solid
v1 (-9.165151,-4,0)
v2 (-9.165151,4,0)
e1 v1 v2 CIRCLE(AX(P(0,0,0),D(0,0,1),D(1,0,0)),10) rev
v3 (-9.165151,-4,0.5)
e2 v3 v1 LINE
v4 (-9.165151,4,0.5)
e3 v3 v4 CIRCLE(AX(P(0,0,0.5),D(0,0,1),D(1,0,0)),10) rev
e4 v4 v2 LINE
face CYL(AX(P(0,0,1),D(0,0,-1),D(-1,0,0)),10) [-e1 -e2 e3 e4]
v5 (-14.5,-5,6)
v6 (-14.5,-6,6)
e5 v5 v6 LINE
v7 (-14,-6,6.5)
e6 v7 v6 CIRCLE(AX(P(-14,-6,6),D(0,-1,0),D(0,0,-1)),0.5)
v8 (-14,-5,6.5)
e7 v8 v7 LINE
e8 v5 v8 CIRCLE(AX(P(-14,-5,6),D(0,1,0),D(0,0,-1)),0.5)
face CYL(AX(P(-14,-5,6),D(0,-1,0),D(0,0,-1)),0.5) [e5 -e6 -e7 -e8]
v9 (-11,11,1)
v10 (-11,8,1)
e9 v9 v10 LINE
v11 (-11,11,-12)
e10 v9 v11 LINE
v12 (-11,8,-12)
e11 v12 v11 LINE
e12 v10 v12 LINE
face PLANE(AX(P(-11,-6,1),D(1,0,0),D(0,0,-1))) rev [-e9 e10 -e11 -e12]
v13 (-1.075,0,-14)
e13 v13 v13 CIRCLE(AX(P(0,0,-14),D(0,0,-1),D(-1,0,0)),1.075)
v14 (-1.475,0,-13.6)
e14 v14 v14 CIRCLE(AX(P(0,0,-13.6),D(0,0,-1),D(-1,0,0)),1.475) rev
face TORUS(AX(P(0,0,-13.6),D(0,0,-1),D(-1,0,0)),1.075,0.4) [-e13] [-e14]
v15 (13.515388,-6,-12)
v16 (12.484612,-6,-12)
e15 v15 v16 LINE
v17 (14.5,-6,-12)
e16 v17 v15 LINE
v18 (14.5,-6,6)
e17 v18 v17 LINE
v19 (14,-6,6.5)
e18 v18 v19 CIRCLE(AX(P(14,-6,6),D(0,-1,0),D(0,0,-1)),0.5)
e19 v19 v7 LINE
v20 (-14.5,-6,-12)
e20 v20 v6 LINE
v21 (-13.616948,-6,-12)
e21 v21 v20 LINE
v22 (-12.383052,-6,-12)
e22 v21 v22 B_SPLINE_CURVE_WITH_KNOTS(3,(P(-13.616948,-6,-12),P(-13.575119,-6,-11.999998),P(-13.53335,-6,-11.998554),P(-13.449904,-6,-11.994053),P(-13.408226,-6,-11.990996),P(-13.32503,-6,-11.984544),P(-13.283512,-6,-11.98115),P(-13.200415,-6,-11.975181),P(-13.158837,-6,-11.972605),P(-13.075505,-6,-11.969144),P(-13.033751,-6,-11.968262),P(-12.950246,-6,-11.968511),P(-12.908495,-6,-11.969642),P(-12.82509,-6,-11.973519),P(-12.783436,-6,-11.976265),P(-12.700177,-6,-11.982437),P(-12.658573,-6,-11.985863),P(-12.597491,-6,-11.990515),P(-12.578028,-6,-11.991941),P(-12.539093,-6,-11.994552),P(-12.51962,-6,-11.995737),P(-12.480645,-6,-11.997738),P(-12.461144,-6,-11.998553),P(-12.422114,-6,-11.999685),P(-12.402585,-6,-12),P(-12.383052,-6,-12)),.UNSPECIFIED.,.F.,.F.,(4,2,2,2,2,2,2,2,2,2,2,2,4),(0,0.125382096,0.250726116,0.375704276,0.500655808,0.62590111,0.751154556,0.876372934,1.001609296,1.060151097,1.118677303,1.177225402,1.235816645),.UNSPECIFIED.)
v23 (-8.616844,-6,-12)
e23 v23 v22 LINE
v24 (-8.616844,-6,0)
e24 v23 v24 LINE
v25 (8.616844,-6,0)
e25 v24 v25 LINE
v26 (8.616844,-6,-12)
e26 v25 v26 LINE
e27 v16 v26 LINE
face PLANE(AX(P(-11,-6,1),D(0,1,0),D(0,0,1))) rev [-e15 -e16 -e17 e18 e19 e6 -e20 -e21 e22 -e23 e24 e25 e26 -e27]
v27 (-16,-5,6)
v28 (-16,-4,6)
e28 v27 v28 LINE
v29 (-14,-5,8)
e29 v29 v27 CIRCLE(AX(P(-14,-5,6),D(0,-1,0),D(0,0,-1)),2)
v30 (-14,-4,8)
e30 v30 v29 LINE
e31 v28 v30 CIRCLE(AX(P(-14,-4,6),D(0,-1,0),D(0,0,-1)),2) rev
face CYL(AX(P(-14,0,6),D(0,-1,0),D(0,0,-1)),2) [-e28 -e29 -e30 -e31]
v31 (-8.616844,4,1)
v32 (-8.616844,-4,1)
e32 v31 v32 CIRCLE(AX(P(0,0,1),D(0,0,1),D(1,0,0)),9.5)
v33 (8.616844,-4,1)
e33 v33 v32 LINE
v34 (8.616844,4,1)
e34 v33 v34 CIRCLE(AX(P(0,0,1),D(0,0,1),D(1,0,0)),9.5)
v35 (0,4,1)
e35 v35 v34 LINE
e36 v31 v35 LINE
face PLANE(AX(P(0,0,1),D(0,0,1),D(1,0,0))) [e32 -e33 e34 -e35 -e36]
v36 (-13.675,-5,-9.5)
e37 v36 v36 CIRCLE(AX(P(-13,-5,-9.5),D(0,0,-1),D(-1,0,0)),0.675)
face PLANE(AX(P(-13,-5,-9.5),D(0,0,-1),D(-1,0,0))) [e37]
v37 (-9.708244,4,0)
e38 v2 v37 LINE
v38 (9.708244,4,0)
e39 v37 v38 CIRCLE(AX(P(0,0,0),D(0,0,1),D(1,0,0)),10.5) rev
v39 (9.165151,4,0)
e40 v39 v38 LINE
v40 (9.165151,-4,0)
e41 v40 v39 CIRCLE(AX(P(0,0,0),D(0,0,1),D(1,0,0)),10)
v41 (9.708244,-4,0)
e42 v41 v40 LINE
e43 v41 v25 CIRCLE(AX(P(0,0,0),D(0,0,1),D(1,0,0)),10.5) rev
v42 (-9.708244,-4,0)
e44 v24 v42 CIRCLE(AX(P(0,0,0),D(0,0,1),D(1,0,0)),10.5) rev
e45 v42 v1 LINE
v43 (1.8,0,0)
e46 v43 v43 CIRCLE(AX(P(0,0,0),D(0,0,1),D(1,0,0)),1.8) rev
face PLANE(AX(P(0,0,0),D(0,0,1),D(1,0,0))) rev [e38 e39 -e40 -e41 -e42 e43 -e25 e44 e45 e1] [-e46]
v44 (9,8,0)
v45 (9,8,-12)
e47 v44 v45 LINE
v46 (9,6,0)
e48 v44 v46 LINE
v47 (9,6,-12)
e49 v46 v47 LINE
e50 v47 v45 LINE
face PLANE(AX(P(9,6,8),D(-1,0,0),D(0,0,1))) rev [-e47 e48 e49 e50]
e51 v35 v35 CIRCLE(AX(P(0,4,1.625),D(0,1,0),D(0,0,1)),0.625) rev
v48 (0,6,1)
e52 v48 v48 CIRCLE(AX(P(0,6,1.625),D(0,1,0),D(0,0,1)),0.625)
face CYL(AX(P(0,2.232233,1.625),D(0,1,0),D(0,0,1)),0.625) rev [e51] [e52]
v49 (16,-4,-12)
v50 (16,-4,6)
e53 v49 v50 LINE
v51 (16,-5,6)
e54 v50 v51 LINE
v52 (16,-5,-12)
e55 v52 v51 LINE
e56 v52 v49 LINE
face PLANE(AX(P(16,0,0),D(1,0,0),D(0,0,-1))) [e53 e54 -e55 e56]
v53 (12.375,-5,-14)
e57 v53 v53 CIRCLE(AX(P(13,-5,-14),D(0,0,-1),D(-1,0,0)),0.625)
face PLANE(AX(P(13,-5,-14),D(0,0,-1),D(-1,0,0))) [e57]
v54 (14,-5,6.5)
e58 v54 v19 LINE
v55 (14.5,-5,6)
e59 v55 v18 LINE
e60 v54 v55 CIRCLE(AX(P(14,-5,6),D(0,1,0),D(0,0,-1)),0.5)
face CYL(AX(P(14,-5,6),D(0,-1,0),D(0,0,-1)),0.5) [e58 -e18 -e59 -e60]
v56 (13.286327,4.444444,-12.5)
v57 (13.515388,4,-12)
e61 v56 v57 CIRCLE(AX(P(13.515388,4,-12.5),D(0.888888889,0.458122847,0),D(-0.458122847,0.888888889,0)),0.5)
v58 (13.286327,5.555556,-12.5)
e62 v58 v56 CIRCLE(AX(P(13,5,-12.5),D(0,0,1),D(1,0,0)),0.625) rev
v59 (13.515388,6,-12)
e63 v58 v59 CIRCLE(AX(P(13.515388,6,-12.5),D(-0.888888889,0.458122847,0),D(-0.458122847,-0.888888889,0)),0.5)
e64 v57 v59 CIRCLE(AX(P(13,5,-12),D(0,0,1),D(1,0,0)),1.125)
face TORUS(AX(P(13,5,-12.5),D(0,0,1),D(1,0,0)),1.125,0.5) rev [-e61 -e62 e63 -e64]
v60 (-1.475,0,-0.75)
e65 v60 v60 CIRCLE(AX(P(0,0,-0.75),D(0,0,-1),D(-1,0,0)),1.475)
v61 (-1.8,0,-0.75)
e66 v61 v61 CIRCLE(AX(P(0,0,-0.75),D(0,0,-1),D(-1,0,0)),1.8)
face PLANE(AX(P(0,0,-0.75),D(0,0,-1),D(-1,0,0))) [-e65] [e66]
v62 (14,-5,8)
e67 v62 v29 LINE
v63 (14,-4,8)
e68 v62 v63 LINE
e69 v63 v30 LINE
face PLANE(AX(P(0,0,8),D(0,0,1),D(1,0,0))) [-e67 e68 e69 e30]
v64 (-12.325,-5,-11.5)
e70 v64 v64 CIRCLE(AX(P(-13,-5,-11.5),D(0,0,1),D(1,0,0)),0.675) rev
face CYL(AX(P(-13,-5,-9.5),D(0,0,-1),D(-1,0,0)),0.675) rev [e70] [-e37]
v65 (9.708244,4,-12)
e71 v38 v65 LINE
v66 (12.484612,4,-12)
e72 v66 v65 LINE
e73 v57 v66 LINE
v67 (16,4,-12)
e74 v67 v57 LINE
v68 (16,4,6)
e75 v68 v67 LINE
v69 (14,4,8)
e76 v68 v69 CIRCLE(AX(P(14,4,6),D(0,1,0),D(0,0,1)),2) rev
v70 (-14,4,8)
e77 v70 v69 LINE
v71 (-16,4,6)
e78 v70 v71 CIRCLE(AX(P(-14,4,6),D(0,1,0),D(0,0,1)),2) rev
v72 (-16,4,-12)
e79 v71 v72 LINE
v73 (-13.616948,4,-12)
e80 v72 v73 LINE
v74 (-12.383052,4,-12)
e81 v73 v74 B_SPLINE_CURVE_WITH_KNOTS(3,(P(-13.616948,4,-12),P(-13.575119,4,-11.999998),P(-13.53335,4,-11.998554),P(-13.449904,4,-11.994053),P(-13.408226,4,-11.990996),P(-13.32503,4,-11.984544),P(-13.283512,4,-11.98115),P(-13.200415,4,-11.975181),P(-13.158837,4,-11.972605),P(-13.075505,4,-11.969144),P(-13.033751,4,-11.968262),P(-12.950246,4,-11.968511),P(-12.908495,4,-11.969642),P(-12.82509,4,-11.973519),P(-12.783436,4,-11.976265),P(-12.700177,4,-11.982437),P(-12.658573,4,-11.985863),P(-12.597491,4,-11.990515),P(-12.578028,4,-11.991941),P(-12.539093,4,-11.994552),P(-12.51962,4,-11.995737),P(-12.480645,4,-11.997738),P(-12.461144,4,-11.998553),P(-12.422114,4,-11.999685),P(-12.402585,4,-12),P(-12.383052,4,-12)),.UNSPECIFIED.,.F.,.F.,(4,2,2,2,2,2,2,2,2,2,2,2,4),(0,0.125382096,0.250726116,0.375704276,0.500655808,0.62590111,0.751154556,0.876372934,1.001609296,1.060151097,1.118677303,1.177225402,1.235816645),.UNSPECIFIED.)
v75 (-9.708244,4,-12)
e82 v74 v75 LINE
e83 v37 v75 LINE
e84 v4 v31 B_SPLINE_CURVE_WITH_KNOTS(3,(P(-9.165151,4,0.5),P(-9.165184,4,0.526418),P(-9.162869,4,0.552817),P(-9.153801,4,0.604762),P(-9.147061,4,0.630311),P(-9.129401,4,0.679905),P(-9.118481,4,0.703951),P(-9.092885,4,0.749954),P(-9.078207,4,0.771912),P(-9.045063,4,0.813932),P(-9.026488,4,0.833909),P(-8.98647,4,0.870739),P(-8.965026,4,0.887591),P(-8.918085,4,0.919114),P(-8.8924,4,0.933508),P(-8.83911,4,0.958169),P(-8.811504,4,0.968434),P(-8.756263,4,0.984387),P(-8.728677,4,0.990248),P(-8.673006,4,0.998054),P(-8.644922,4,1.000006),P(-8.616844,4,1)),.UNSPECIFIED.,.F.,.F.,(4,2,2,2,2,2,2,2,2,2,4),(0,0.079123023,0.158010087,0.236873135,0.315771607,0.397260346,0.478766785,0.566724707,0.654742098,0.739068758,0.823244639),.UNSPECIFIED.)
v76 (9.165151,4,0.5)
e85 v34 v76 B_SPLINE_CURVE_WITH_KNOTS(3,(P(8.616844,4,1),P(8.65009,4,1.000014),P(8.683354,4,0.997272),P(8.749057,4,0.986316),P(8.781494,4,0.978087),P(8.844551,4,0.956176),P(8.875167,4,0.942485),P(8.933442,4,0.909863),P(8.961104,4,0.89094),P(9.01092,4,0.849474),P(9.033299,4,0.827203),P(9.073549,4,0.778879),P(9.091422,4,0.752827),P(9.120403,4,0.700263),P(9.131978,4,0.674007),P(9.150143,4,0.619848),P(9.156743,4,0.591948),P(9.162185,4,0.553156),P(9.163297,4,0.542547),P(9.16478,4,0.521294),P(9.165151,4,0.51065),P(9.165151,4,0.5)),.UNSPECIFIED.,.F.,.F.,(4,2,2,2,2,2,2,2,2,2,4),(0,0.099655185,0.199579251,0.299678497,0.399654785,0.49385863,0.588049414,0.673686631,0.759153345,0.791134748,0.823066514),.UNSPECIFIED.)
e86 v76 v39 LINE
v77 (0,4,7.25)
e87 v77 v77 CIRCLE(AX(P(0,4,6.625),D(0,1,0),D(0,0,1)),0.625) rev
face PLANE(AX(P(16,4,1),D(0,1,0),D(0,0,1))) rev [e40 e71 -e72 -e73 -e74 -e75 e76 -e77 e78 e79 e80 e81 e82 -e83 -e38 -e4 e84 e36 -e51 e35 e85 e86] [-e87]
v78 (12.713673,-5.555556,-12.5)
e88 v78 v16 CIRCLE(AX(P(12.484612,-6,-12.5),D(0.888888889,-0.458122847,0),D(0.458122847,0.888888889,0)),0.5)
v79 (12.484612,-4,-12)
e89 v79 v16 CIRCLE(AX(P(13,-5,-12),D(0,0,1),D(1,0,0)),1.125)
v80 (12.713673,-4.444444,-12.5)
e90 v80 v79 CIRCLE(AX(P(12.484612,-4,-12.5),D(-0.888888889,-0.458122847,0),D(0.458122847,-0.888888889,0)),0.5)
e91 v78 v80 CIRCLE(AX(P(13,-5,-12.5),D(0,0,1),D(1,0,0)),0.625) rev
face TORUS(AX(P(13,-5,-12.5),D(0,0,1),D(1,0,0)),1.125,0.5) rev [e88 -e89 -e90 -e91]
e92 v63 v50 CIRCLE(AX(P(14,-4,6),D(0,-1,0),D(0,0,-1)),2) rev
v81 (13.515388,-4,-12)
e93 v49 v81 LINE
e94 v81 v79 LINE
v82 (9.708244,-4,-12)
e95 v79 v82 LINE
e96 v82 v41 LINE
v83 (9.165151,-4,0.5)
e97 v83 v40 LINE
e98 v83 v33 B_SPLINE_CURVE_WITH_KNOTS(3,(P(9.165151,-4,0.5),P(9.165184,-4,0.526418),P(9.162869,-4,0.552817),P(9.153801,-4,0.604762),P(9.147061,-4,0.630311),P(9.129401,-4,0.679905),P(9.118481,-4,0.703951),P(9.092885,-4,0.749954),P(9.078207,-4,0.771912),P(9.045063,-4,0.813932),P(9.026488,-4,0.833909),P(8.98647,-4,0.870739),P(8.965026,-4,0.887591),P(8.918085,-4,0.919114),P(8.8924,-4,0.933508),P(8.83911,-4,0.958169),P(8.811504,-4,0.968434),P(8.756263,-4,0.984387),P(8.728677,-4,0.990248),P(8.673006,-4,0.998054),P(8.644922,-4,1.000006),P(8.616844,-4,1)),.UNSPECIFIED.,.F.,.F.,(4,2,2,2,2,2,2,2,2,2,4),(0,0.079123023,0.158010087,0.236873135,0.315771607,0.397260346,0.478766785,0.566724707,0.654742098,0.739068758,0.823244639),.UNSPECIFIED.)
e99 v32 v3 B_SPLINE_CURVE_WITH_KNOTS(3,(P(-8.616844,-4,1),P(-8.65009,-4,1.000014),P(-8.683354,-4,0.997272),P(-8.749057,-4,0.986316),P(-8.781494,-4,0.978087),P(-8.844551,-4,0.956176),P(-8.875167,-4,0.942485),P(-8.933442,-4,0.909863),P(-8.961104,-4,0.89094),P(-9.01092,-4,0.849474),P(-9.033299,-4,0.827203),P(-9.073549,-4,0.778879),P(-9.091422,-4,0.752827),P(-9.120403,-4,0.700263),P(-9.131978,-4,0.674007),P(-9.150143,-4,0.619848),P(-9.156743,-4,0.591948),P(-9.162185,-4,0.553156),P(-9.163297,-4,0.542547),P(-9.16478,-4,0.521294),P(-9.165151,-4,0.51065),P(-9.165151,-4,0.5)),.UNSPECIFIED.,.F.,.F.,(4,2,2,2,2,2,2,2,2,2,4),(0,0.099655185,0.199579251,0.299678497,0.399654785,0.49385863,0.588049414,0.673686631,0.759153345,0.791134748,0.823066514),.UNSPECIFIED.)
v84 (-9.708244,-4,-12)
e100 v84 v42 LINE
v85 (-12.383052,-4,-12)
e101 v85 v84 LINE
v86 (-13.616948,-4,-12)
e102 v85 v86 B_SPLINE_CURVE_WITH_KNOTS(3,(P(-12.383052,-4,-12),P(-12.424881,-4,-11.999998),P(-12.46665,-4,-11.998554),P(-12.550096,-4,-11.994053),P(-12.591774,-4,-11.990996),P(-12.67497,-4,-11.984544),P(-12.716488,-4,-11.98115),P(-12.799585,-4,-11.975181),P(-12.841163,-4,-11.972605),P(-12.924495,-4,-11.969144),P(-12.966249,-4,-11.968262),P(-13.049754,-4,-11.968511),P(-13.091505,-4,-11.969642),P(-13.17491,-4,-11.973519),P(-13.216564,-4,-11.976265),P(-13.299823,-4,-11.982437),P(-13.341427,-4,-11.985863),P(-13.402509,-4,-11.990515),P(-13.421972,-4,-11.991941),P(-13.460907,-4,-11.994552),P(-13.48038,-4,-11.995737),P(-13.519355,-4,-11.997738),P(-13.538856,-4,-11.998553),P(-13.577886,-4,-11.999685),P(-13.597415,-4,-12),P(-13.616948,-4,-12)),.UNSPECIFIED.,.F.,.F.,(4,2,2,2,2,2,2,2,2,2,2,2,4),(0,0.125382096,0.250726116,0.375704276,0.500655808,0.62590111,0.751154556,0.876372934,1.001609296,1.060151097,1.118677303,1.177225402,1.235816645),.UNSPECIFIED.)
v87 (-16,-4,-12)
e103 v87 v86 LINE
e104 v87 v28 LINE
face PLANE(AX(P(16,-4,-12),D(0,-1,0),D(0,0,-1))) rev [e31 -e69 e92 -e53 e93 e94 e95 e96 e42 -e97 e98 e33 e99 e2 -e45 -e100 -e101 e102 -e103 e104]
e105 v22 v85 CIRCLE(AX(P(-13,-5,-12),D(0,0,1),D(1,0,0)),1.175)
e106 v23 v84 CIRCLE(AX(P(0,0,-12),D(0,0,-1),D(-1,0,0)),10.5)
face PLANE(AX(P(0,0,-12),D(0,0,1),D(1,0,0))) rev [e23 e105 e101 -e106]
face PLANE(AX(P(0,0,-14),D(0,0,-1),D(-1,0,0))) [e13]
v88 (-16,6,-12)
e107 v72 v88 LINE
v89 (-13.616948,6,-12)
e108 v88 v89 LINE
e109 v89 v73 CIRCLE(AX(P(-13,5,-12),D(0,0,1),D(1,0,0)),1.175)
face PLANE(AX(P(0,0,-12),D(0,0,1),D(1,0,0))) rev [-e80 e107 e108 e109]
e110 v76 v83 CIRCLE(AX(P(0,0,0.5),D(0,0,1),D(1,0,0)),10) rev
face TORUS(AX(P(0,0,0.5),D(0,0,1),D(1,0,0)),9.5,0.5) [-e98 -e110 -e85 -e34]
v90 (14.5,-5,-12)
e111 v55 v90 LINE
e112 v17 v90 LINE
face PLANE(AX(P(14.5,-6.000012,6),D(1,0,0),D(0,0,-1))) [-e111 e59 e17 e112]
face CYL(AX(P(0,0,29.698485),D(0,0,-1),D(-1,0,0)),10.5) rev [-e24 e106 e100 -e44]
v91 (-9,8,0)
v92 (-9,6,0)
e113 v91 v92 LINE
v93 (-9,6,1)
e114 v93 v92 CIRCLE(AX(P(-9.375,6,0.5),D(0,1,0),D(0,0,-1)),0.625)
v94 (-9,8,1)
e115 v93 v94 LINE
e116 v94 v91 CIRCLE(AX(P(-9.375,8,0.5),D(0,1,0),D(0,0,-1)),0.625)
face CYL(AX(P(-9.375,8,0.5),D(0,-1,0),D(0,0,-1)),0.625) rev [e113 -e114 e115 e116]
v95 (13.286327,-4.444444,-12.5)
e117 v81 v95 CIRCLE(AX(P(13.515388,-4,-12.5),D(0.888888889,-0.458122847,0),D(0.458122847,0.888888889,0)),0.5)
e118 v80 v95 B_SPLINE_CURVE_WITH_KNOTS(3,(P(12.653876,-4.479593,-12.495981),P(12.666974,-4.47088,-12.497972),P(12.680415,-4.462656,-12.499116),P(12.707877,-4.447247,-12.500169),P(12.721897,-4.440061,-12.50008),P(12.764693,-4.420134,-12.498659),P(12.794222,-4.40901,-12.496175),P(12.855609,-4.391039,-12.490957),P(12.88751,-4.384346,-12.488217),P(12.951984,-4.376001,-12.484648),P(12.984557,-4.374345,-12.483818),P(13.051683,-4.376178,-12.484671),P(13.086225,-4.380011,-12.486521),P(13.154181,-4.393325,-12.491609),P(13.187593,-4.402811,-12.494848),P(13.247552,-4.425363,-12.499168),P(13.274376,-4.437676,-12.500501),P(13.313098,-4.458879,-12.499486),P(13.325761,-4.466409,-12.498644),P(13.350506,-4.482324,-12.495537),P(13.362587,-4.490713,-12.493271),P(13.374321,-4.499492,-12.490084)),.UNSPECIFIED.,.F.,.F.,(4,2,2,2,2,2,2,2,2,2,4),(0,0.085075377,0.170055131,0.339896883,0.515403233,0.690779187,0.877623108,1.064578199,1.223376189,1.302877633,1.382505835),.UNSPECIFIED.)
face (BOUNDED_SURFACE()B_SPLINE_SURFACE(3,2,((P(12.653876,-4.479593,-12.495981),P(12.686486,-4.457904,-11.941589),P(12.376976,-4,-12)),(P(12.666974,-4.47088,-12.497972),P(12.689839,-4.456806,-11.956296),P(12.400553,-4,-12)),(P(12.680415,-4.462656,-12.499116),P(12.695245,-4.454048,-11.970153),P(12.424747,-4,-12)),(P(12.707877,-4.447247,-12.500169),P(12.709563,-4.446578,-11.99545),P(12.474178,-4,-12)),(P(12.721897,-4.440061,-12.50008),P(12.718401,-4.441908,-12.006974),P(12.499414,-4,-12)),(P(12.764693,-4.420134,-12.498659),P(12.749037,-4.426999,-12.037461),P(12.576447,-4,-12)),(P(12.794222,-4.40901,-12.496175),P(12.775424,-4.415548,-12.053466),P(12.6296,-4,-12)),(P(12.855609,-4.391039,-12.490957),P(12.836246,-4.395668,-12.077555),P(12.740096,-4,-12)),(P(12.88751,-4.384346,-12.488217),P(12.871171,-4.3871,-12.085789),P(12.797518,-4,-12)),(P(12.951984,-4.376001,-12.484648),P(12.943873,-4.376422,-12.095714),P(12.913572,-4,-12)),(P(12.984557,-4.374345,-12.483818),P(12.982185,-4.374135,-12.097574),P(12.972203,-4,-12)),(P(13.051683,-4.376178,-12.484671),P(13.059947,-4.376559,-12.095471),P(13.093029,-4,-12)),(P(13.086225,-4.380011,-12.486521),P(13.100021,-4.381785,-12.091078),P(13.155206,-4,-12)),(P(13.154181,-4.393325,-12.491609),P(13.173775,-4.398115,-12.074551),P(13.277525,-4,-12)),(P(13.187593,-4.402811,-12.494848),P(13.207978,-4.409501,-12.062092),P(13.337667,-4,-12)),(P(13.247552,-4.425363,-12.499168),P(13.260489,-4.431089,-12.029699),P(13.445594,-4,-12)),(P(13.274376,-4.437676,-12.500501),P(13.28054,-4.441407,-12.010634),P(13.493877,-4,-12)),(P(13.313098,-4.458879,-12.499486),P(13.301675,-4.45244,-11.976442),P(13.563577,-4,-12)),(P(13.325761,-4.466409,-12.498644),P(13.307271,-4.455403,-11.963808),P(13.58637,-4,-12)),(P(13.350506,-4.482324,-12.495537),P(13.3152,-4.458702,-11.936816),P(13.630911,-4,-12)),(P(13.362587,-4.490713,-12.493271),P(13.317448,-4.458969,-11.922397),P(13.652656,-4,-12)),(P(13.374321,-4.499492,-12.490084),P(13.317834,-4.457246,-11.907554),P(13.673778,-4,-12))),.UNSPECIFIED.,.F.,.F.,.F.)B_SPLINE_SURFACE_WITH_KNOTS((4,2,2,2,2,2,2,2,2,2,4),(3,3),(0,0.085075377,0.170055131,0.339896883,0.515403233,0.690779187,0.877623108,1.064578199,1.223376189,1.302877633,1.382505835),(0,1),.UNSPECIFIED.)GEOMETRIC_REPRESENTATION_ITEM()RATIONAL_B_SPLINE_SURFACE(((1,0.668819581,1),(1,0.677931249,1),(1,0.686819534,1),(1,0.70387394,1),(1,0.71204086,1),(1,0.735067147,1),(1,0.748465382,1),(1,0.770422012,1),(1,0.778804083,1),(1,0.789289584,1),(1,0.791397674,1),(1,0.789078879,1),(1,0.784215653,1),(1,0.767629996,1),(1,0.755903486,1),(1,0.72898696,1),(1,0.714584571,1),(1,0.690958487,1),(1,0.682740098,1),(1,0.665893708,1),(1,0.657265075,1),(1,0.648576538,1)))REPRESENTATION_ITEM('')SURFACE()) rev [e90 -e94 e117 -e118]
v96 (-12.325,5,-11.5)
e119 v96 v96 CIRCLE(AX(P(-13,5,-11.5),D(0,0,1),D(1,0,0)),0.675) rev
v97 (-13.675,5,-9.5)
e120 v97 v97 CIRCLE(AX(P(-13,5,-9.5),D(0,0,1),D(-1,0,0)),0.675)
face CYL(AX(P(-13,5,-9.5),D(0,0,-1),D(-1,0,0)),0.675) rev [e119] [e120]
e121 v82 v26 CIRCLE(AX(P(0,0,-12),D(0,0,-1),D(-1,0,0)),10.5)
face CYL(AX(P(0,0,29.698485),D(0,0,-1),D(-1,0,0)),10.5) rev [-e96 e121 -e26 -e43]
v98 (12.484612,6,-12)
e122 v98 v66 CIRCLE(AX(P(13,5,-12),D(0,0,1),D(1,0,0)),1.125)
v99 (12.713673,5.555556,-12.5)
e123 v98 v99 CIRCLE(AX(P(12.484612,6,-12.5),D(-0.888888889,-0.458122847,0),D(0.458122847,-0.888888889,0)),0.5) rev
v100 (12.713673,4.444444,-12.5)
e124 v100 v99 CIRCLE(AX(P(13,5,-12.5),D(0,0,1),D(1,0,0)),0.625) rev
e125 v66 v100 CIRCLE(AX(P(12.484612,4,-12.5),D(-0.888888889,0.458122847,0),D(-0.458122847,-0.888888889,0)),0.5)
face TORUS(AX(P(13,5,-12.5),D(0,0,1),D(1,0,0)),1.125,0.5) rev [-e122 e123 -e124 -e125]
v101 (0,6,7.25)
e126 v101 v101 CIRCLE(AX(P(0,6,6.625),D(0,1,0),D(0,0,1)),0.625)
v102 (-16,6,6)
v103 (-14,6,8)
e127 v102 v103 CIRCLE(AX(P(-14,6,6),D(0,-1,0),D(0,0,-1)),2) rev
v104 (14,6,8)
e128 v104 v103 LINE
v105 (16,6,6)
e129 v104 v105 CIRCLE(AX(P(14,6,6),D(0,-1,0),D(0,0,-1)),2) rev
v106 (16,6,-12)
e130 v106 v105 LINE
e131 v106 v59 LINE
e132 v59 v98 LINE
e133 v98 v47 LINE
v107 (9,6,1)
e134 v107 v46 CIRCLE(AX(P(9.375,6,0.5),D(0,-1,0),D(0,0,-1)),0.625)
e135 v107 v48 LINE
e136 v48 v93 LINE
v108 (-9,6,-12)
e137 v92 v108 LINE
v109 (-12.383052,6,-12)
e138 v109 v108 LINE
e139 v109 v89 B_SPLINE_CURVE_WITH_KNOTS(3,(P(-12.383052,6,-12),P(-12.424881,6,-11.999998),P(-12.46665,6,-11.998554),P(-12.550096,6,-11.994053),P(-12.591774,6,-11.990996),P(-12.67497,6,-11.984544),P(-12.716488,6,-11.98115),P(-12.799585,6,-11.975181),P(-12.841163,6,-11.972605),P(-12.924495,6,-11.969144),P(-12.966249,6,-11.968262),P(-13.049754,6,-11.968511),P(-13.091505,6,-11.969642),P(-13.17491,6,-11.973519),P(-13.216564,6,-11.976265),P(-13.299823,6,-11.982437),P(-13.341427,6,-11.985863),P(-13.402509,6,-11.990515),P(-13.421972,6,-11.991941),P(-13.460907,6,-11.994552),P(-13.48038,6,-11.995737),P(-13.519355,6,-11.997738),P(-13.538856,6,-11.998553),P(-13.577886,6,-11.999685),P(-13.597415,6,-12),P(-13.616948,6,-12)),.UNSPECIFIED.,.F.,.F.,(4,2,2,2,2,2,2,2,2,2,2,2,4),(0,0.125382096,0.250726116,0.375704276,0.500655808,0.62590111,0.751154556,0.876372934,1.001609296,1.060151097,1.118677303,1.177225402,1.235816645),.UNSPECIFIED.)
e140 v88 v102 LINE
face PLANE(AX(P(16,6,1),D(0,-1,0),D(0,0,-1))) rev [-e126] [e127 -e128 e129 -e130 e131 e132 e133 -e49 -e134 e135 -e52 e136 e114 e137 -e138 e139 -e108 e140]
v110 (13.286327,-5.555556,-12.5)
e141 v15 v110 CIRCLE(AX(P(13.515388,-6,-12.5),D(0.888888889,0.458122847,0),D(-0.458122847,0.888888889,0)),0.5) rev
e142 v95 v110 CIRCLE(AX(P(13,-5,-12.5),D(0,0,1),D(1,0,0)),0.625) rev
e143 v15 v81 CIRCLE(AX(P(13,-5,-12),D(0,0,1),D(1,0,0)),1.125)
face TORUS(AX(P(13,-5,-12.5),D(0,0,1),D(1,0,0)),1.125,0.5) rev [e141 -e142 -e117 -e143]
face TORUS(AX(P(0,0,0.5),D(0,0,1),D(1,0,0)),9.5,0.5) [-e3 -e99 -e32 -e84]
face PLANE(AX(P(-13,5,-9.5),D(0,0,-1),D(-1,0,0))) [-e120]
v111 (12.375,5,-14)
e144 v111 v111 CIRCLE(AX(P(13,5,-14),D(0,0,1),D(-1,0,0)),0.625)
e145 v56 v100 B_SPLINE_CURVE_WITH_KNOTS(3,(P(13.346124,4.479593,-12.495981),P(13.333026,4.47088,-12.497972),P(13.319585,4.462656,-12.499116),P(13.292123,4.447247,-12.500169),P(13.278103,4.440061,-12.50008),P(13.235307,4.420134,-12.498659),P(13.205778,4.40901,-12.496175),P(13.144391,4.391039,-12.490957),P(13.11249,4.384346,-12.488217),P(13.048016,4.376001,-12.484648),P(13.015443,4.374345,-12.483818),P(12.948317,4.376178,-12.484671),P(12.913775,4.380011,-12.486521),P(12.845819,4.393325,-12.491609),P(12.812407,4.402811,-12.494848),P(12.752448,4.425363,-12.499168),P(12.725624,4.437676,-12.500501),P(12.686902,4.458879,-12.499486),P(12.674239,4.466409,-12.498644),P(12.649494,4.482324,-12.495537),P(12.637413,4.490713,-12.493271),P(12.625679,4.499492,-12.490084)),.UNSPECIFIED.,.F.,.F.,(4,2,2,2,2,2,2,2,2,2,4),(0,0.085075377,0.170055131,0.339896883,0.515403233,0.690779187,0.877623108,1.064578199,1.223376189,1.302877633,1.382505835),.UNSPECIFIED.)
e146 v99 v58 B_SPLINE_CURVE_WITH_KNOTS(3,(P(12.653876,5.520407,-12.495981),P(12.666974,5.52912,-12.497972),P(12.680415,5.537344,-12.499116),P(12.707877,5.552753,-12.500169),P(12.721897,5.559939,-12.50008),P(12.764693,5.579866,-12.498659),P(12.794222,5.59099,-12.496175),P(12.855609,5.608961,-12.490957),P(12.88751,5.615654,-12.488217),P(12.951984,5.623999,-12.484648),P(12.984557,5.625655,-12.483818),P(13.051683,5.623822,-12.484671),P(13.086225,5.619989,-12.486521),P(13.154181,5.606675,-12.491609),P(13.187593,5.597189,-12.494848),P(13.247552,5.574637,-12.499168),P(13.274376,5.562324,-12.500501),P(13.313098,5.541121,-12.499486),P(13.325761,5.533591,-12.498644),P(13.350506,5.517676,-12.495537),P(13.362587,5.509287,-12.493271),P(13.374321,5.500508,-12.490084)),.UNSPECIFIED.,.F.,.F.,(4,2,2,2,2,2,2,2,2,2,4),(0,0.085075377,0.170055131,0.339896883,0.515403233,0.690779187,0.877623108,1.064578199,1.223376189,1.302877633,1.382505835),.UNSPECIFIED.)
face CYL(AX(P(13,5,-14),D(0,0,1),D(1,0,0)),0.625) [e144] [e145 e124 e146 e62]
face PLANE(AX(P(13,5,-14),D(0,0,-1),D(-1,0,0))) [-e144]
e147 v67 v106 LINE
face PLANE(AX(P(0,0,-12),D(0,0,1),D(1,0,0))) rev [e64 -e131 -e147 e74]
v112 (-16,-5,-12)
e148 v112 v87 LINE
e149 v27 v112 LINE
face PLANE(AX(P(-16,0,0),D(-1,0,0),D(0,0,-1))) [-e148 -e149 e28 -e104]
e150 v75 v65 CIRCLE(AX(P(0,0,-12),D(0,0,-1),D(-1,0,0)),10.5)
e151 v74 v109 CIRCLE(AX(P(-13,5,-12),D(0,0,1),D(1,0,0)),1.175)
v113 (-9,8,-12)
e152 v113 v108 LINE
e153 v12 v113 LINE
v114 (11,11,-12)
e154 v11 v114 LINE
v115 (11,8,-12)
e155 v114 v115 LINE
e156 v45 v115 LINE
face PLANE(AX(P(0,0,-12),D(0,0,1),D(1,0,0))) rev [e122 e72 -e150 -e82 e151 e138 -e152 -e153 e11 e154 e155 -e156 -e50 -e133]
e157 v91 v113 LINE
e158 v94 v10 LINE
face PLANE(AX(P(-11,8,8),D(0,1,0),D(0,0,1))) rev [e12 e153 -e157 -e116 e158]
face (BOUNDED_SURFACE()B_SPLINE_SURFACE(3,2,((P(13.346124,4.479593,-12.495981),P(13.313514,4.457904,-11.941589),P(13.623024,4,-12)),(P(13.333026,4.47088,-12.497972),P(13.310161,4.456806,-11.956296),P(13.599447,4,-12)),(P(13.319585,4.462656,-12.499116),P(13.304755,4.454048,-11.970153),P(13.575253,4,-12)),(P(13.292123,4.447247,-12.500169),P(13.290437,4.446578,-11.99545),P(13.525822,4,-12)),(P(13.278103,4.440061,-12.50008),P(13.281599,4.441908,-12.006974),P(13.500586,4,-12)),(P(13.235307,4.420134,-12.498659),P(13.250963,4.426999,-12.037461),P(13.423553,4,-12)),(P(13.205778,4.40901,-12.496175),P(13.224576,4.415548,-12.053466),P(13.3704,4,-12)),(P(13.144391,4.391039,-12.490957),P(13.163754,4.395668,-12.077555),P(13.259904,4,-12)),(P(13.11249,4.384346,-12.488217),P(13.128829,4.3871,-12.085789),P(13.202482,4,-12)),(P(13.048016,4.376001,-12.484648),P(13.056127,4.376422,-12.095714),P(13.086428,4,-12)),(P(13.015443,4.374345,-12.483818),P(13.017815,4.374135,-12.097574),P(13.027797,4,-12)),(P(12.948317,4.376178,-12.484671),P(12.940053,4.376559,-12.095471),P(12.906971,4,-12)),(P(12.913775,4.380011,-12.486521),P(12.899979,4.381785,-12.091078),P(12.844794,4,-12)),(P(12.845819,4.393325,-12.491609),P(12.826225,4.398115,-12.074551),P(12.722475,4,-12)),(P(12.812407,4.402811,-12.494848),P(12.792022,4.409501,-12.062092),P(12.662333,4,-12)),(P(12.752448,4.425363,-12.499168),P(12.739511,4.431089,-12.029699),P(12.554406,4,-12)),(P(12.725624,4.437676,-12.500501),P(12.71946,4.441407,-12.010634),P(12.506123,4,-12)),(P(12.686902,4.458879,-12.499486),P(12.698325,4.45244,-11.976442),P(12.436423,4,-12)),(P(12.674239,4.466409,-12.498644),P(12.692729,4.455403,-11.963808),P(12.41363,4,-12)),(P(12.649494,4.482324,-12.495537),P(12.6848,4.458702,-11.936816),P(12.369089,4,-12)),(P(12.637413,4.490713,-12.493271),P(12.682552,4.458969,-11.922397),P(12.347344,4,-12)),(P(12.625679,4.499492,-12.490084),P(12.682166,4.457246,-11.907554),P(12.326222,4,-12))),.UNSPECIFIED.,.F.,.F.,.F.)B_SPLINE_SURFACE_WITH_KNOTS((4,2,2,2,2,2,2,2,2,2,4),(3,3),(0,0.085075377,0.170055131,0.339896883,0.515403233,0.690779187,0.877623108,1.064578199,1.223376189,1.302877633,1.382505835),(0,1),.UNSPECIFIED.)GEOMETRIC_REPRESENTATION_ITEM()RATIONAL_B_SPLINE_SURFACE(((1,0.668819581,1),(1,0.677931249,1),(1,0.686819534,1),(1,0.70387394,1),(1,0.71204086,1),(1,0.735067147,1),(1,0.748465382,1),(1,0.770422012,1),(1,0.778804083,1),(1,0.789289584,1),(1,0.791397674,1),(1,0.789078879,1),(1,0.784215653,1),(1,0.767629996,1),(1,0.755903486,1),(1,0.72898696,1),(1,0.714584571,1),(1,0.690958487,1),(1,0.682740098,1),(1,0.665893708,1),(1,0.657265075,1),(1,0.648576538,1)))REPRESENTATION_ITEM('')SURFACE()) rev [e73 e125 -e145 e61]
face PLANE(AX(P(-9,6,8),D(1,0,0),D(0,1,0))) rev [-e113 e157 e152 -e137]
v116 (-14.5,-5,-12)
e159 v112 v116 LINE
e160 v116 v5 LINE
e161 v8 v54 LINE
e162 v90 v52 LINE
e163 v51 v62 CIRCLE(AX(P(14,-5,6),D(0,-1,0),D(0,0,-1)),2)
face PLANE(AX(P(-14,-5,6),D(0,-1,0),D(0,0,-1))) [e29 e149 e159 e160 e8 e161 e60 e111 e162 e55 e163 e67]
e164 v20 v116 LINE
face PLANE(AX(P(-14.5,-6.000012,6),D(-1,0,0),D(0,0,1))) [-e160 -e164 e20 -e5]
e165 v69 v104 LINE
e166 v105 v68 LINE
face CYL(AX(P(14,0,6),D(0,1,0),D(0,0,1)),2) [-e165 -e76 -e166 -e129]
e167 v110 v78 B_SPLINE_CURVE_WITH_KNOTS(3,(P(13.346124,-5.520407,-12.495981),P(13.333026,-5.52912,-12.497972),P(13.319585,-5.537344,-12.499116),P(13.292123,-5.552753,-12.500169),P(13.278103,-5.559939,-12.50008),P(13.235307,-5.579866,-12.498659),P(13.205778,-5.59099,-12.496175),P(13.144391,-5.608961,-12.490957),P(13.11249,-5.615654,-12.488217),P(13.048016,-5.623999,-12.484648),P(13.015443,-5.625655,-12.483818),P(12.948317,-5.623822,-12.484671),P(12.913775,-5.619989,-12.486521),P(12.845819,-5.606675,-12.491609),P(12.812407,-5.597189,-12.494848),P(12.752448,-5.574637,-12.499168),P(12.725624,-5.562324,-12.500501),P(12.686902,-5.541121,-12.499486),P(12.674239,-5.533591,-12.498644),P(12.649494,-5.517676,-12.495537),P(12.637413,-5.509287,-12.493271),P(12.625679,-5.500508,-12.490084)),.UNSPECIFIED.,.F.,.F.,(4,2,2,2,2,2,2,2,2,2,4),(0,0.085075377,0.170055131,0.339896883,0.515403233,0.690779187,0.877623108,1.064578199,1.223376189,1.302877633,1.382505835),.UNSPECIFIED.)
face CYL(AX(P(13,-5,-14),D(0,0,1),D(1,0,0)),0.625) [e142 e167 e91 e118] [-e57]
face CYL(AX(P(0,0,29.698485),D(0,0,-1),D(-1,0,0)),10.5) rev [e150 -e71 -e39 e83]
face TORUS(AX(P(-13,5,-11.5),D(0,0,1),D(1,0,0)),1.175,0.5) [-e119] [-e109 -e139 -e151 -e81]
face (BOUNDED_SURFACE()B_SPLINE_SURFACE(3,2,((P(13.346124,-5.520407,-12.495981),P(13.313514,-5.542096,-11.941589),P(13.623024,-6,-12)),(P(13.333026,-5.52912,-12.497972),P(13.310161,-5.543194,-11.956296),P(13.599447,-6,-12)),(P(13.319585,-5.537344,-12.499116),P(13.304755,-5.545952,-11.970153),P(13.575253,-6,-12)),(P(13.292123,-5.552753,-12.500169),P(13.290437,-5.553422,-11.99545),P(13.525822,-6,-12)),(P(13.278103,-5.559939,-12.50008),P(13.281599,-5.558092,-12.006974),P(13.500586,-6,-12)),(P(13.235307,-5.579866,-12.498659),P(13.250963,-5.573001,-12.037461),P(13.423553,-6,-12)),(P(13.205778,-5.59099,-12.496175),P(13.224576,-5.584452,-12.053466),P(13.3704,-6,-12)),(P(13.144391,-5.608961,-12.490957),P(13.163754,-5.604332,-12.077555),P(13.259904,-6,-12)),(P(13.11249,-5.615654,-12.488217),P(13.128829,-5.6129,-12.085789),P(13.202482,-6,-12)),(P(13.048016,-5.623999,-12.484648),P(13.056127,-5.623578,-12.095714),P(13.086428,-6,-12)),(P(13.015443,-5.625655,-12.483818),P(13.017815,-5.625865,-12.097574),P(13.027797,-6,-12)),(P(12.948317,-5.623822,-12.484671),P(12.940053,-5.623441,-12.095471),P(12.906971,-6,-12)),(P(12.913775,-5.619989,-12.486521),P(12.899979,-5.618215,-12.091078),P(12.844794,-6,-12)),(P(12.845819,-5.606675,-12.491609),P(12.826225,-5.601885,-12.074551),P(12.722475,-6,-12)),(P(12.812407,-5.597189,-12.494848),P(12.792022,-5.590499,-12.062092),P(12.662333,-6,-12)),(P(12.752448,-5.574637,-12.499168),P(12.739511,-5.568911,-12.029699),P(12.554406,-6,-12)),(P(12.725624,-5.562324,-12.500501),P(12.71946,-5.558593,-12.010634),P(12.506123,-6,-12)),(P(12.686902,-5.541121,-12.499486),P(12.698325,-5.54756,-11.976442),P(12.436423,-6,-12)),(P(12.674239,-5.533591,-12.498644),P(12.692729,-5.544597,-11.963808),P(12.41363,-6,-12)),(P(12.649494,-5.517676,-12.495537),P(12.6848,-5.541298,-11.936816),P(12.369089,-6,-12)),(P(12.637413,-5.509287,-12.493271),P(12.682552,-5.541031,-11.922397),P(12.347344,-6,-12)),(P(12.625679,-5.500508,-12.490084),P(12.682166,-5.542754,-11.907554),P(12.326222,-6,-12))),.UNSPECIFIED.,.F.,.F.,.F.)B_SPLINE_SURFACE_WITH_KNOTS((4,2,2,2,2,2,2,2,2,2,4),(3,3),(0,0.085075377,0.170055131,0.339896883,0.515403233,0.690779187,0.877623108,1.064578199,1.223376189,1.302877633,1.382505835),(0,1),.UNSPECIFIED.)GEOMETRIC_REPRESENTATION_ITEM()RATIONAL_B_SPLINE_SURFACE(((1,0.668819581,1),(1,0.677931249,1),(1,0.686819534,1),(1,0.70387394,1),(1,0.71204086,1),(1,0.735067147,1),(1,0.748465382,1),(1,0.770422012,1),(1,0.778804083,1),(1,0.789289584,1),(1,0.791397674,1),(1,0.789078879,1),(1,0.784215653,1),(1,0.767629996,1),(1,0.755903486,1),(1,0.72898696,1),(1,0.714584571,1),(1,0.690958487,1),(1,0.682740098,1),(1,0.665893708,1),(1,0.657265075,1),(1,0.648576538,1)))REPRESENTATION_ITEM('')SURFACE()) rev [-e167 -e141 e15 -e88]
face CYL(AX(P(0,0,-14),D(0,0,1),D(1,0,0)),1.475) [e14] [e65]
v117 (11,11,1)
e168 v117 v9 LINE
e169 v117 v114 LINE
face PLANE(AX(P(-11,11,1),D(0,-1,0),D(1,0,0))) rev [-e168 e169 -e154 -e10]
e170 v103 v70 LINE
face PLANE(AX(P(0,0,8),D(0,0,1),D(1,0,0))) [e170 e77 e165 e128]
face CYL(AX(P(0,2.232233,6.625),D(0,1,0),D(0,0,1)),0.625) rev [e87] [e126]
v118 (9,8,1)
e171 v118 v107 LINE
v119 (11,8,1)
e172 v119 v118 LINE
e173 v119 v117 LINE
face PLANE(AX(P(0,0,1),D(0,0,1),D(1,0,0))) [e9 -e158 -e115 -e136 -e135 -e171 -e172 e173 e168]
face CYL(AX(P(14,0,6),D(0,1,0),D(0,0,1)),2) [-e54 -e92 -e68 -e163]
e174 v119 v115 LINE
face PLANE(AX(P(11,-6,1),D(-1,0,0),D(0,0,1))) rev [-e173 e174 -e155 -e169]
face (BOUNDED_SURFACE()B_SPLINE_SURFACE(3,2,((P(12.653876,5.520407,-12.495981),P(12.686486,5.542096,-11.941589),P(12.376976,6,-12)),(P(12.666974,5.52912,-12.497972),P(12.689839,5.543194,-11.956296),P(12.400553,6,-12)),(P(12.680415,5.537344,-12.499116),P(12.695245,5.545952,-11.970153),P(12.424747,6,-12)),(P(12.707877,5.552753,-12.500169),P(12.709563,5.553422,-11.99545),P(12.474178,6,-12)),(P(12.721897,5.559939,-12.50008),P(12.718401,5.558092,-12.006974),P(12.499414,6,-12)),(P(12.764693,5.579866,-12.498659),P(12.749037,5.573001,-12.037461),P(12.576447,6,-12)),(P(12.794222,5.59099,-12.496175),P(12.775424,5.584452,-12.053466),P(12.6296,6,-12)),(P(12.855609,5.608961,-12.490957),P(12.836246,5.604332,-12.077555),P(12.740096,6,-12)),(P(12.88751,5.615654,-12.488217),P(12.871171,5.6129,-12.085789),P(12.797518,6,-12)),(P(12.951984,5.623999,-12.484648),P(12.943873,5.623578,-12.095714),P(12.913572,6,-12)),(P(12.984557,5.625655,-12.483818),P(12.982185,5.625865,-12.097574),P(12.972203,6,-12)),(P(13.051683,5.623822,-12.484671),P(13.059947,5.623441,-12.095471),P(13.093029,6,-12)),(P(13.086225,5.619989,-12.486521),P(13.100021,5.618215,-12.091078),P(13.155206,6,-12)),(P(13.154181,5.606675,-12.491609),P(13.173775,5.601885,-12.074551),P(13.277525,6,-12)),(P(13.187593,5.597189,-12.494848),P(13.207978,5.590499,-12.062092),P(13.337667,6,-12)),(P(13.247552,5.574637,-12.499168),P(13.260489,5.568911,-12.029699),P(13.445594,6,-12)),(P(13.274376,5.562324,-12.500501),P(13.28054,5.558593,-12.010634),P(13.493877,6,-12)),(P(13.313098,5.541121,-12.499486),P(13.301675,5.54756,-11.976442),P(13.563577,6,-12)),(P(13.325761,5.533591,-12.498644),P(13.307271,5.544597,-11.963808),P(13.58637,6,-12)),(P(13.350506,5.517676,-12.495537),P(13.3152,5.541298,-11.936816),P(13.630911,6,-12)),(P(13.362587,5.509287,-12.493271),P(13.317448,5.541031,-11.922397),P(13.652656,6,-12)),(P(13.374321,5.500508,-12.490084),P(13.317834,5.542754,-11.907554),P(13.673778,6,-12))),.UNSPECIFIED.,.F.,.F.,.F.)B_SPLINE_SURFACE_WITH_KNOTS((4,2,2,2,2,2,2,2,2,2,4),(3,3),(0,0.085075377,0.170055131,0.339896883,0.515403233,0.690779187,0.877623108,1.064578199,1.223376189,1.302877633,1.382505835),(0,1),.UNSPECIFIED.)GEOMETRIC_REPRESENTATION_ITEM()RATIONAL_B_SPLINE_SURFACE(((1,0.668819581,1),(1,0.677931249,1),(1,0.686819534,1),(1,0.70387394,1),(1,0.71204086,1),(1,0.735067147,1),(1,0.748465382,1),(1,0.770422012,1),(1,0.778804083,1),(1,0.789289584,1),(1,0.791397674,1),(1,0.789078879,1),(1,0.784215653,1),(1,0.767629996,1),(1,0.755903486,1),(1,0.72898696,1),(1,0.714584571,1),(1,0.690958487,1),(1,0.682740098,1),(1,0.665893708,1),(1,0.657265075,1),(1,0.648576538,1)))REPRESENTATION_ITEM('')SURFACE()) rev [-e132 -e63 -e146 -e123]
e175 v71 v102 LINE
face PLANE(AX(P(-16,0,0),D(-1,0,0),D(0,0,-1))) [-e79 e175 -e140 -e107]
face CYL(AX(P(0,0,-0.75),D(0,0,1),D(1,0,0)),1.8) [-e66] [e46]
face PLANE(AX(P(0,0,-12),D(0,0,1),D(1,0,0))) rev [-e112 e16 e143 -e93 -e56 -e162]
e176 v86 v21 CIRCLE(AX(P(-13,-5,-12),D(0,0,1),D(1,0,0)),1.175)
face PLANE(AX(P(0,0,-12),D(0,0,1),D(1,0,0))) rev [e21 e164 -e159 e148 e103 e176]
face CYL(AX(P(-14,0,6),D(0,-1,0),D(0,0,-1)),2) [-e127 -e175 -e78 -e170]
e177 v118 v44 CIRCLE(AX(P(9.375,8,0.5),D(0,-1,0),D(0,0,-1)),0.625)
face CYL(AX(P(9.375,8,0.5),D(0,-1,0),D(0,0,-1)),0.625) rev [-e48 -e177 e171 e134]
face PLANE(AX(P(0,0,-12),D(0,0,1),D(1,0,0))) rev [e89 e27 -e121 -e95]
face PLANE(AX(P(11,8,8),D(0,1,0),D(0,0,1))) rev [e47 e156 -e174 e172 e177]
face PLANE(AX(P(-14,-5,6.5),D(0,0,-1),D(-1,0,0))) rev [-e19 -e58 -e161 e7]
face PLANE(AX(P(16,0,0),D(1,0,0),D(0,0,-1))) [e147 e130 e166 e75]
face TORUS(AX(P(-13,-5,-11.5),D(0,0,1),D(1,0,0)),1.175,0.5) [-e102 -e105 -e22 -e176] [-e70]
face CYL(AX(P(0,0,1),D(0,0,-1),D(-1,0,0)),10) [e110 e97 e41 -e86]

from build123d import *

# Parameters (mm, degrees)
BOSS_EXTRUDE1_DEPTH     = 1
SKETCH2_R               = 1.475
BOSS_EXTRUDE2_DEPTH     = 14
SKETCH3_R               = 1.8
BOSS_EXTRUDE3_DEPTH     = 0.75
SKETCH4_W               = 2
SKETCH4_H               = 17
BOSS_EXTRUDE4_DEPTH     = 12
SKETCH5_W               = 18
SKETCH5_H               = 2
BOSS_EXTRUDE5_DEPTH     = 12
SKETCH6_W               = 13
SKETCH6_H               = 2
BOSS_EXTRUDE6_DEPTH     = 5
BOSS_EXTRUDE7_DEPTH     = 12
CUT_EXTRUDE1_DEPTH      = 24.366642891
SKETCH9_W               = 2.937742252
SKETCH9_H               = 8
CUT_EXTRUDE2_DEPTH      = 12
CUT_EXTRUDE11_START     = -12
SKETCH21_R              = 10.5
SKETCH21_R_2            = 1.8
CUT_EXTRUDE11_DEPTH     = 12
SKETCH10_W              = 32
SKETCH10_H              = 2
BOSS_EXTRUDE8_DEPTH     = 7
FILLET1_R               = 0.5
SKETCH11_R              = 0.625
BOSS_EXTRUDE9_DEPTH     = 2
SKETCH14_W              = 2
SKETCH14_H              = 2
CUT_EXTRUDE5_DEPTH      = 28.874719859
SKETCH12_R              = 0.675
CUT_EXTRUDE3_DEPTH      = 2.5
CUT_EXTRUDE6_DEPTH      = 2
FILLET2_R               = 0.5
FILLET3_R               = 0.5
FILLET4_R               = 2
CUT_EXTRUDE7_DEPTH      = 28.221315288
CUT_EXTRUDE7_DEPTH_BACK = 1
SKETCH19_R              = 0.625
CUT_EXTRUDE9_DEPTH      = 2
FILLET5_R               = 0.4


with BuildPart() as part:
    # Sketch1 → Boss-Extrude1 (new body)
    with BuildSketch(Plane.XY):
        Polygon((-11, 6), (-11, 11), (11, 11), (11, 6), (11, -6), (-11, -6), align=None)
    extrude(amount=BOSS_EXTRUDE1_DEPTH)

    # Sketch2 → Boss-Extrude2 (add)
    with BuildSketch(Plane(origin=(0, 0, 0), x_dir=(-1, 0, 0), z_dir=(0, 0, -1))):
        with Locations(Location((0, 0, 0), (0, 0, 180))):
            Circle(SKETCH2_R)
    extrude(amount=BOSS_EXTRUDE2_DEPTH)

    # Sketch3 → Boss-Extrude3 (add)
    with BuildSketch(Plane(origin=(0, 0, 0), x_dir=(-1, 0, 0), z_dir=(0, 0, -1))):
        with Locations(Location((0, 0, 0), (0, 0, 180))):
            Circle(SKETCH3_R)
    extrude(amount=BOSS_EXTRUDE3_DEPTH)

    # Sketch4 → Boss-Extrude4 (add)
    with BuildSketch(Plane(origin=(0, 0, 0), x_dir=(-1, 0, 0), z_dir=(0, 0, -1))):
        with Locations((10, 2.5)):
            Rectangle(SKETCH4_W, SKETCH4_H)
        with Locations((-10, 2.5)):
            Rectangle(SKETCH4_W, SKETCH4_H)
    extrude(amount=BOSS_EXTRUDE4_DEPTH)

    # Sketch5 → Boss-Extrude5 (add)
    with BuildSketch(Plane(origin=(0, 0, 0), x_dir=(-1, 0, 0), z_dir=(0, 0, -1))):
        with Locations((0, 10)):
            Rectangle(SKETCH5_W, SKETCH5_H)
    extrude(amount=BOSS_EXTRUDE5_DEPTH)

    # Sketch6 → Boss-Extrude6 (add)
    with BuildSketch(Plane(origin=(11, 0, 0), x_dir=(0, 0, -1), z_dir=(1, 0, 0))):
        with Locations((5.5, -5)):
            Rectangle(SKETCH6_W, SKETCH6_H)
        with Locations((5.5, 5)):
            Rectangle(SKETCH6_W, SKETCH6_H)
    boss_extrude6 = extrude(amount=BOSS_EXTRUDE6_DEPTH)

    # Mirror1: Boss-Extrude6 across plane
    add(boss_extrude6.mirror(Plane(origin=(0, 0, 0), x_dir=(0, 0, 1), z_dir=(1, 0, 0))))

    # Sketch7 → Boss-Extrude7 (add)
    with BuildSketch(Plane(origin=(0, 0, -12), x_dir=(-1, 0, 0), z_dir=(0, 0, -1))):
        with BuildLine():
            ThreePointArc((-6.708203932, -6), (-8.407551231, -3.211398808), (-9, 0))
            Line((-9, 0), (-9, -6))
            Line((-9, -6), (-6.708203932, -6))
        make_face()
        with BuildLine():
            Line((-9, 9), (-9, 0))
            ThreePointArc((-9, 0), (-6.363961031, 6.363961031), (0, 9))
            Line((0, 9), (-9, 9))
        make_face()
    boss_extrude7 = extrude(amount=-BOSS_EXTRUDE7_DEPTH)

    # Sketch8 → Cut-Extrude1 (cut, through all)
    with BuildSketch(Plane(origin=(0, 0, -12), x_dir=(-1, 0, 0), z_dir=(0, 0, -1))):
        with BuildLine():
            Line((-11, 4), (-9.16515139, 4))
            ThreePointArc((-9.16515139, 4), (-10, 0), (-9.16515139, -4))
            Line((-9.16515139, -4), (-11, -4))
            Line((-11, -4), (-11, 4))
        make_face()
    cut_extrude1 = extrude(amount=-CUT_EXTRUDE1_DEPTH, mode=Mode.SUBTRACT)

    # Sketch9 → Cut-Extrude2 (cut)
    with BuildSketch(Plane(origin=(0, 0, -12), x_dir=(-1, 0, 0), z_dir=(0, 0, -1))):
        with Locations((-9.531128874, 0)):
            Rectangle(SKETCH9_W, SKETCH9_H)
    cut_extrude2 = extrude(amount=-CUT_EXTRUDE2_DEPTH, mode=Mode.SUBTRACT)

    # Mirror2: Boss-Extrude7, Cut-Extrude1, Cut-Extrude2 across plane
    add(boss_extrude7.mirror(Plane(origin=(0, 0, 0), x_dir=(0, 0, 1), z_dir=(1, 0, 0))))
    add(cut_extrude1.mirror(Plane(origin=(0, 0, 0), x_dir=(0, 0, 1), z_dir=(1, 0, 0))), mode=Mode.SUBTRACT)
    add(cut_extrude2.mirror(Plane(origin=(0, 0, 0), x_dir=(0, 0, 1), z_dir=(1, 0, 0))), mode=Mode.SUBTRACT)

    # Sketch21 → Cut-Extrude11 (cut)
    with BuildSketch(Plane(origin=(0, 0, -12), x_dir=(-1, 0, 0), z_dir=(0, 0, -1)).offset(CUT_EXTRUDE11_START)):
        Circle(SKETCH21_R)
        with Locations(Location((0, 0, 0), (0, 0, 180))):
            Circle(SKETCH21_R_2, mode=Mode.SUBTRACT)
    extrude(amount=CUT_EXTRUDE11_DEPTH, mode=Mode.SUBTRACT)

    # Sketch10 → Boss-Extrude8 (add)
    with BuildSketch(Plane.XY.offset(1)):
        with Locations((0, -5)):
            Rectangle(SKETCH10_W, SKETCH10_H)
        with Locations((0, 5)):
            Rectangle(SKETCH10_W, SKETCH10_H)
    extrude(amount=BOSS_EXTRUDE8_DEPTH)

    # Fillet1
    fillet1_edges = [part.edges().sort_by_distance(p)[0] for p in [
        (10, 0, 1),
        (-10, 0, 1),
    ]]
    fillet(fillet1_edges, radius=FILLET1_R)

    # Sketch11 → Boss-Extrude9 (add)
    with BuildSketch(Plane(origin=(0, 0, -12), x_dir=(-1, 0, 0), z_dir=(0, 0, -1))):
        with Locations(Location((-13, -5, 0), (0, 0, 180))):
            Circle(SKETCH11_R)
    boss_extrude9 = extrude(amount=BOSS_EXTRUDE9_DEPTH)

    # Sketch14 → Cut-Extrude5 (cut, through all)
    with BuildSketch(Plane(origin=(0, 0, -12), x_dir=(-1, 0, 0), z_dir=(0, 0, -1))):
        with Locations((10, 7)):
            Rectangle(SKETCH14_W, SKETCH14_H)
        with Locations((-10, 7)):
            Rectangle(SKETCH14_W, SKETCH14_H)
    extrude(amount=-CUT_EXTRUDE5_DEPTH, mode=Mode.SUBTRACT)

    # Sketch12 → Cut-Extrude3 (cut)
    with BuildSketch(Plane(origin=(0, 0, -12), x_dir=(-1, 0, 0), z_dir=(0, 0, -1))):
        with Locations((13, -5)):
            Circle(SKETCH12_R)
    cut_extrude3 = extrude(amount=-CUT_EXTRUDE3_DEPTH, mode=Mode.SUBTRACT)

    # Sketch16 → Cut-Extrude6 (cut)
    with BuildSketch(Plane(origin=(0, 6, 0), x_dir=(1, 0, 0), z_dir=(0, 1, 0))):
        with BuildLine():
            Line((-9, 0), (-9, -1))
            ThreePointArc((-9, -1), (-8.75, -0.5), (-9, 0))
        make_face()
    cut_extrude6 = extrude(amount=CUT_EXTRUDE6_DEPTH, mode=Mode.SUBTRACT)

    # Mirror3: Boss-Extrude9, Cut-Extrude3 across plane
    add(boss_extrude9.mirror(Plane.ZX))
    add(cut_extrude3.mirror(Plane.ZX), mode=Mode.SUBTRACT)

    # Mirror4: Cut-Extrude6 across plane
    add(cut_extrude6.mirror(Plane(origin=(0, 0, 0), x_dir=(0, 0, 1), z_dir=(1, 0, 0))), mode=Mode.SUBTRACT)

    # Fillet2
    fillet2_edges = [part.edges().sort_by_distance(p)[0] for p in [
        (12.375, -5, -12),
        (12.375, 5, -12),
    ]]
    fillet(fillet2_edges, radius=FILLET2_R)

    # Fillet3
    # the kernel refuses this fillet: 0.5 mm, written as the material it takes off along each edge
    with BuildSketch(Plane(origin=(-13, -5, -12), x_dir=(-1, 0, 0), z_dir=(0, -1, 0))) as fillet3_piece_1:
        with BuildLine():
            CenterArc((0.675 + FILLET3_R, -FILLET3_R), FILLET3_R, 90, 90)
            Line((0.675, -FILLET3_R), (0.675, 0))
            Line((0.675, 0), (0.675 + FILLET3_R, 0))
        make_face()
    revolve(axis=Axis((-13, -5, -12), (0, 0, -1)), mode=Mode.SUBTRACT)
    with BuildSketch(Plane(origin=(-13, 5, -12), x_dir=(-1, 0, 0), z_dir=(0, 1, 0))) as fillet3_piece_2:
        with BuildLine():
            CenterArc((0.675 + FILLET3_R, FILLET3_R), FILLET3_R, 180, 90)
            Line((0.675, FILLET3_R), (0.675, 0))
            Line((0.675, 0), (0.675 + FILLET3_R, 0))
        make_face()
    revolve(axis=Axis((-13, 5, -12), (0, 0, 1)), mode=Mode.SUBTRACT)

    # Fillet4
    fillet4_edges = [part.edges().sort_by_distance(p)[0] for p in [
        (16, -5, 8),
        (-16, -5, 8),
        (-16, 5, 8),
        (16, 5, 8),
    ]]
    fillet(fillet4_edges, radius=FILLET4_R)

    # Sketch17 → Cut-Extrude7 (cut, two sides: drawn at the far end of the back side and taken through both)
    with BuildSketch(Plane.XZ.offset(6).offset(-CUT_EXTRUDE7_DEPTH_BACK)):
        with BuildLine():
            Line((-16, 6), (-16, -12))
            Line((-16, -12), (-14.5, -12))
            Line((-14.5, -12), (-14.5, 6))
            ThreePointArc((-14.5, 6), (-14.353553391, 6.353553391), (-14, 6.5))
            Line((-14, 6.5), (14, 6.5))
            ThreePointArc((14, 6.5), (14.353553391, 6.353553391), (14.5, 6))
            Line((14.5, 6), (14.5, -12))
            Line((14.5, -12), (16, -12))
            Line((16, -12), (16, 6))
            ThreePointArc((16, 6), (15.414213562, 7.414213562), (14, 8))
            Line((14, 8), (-14, 8))
            ThreePointArc((-14, 8), (-15.414213562, 7.414213562), (-16, 6))
        make_face()
    extrude(amount=CUT_EXTRUDE7_DEPTH + CUT_EXTRUDE7_DEPTH_BACK, mode=Mode.SUBTRACT)

    # Sketch19 → Cut-Extrude9 (cut)
    with BuildSketch(Plane(origin=(0, 6, 0), x_dir=(1, 0, 0), z_dir=(0, 1, 0))):
        with Locations(Location((0, -1.625, 0), (0, 0, 90))):
            Circle(SKETCH19_R)
        with Locations(Location((0, -6.625, 0), (0, 0, 270))):
            Circle(SKETCH19_R)
    extrude(amount=-CUT_EXTRUDE9_DEPTH, mode=Mode.SUBTRACT)

    # Fillet5
    fillet5_edges = [part.edges().sort_by_distance(p)[0] for p in [
        (-1.475, 0, -14),
    ]]
    fillet(fillet5_edges, radius=FILLET5_R)


solid = part.part
